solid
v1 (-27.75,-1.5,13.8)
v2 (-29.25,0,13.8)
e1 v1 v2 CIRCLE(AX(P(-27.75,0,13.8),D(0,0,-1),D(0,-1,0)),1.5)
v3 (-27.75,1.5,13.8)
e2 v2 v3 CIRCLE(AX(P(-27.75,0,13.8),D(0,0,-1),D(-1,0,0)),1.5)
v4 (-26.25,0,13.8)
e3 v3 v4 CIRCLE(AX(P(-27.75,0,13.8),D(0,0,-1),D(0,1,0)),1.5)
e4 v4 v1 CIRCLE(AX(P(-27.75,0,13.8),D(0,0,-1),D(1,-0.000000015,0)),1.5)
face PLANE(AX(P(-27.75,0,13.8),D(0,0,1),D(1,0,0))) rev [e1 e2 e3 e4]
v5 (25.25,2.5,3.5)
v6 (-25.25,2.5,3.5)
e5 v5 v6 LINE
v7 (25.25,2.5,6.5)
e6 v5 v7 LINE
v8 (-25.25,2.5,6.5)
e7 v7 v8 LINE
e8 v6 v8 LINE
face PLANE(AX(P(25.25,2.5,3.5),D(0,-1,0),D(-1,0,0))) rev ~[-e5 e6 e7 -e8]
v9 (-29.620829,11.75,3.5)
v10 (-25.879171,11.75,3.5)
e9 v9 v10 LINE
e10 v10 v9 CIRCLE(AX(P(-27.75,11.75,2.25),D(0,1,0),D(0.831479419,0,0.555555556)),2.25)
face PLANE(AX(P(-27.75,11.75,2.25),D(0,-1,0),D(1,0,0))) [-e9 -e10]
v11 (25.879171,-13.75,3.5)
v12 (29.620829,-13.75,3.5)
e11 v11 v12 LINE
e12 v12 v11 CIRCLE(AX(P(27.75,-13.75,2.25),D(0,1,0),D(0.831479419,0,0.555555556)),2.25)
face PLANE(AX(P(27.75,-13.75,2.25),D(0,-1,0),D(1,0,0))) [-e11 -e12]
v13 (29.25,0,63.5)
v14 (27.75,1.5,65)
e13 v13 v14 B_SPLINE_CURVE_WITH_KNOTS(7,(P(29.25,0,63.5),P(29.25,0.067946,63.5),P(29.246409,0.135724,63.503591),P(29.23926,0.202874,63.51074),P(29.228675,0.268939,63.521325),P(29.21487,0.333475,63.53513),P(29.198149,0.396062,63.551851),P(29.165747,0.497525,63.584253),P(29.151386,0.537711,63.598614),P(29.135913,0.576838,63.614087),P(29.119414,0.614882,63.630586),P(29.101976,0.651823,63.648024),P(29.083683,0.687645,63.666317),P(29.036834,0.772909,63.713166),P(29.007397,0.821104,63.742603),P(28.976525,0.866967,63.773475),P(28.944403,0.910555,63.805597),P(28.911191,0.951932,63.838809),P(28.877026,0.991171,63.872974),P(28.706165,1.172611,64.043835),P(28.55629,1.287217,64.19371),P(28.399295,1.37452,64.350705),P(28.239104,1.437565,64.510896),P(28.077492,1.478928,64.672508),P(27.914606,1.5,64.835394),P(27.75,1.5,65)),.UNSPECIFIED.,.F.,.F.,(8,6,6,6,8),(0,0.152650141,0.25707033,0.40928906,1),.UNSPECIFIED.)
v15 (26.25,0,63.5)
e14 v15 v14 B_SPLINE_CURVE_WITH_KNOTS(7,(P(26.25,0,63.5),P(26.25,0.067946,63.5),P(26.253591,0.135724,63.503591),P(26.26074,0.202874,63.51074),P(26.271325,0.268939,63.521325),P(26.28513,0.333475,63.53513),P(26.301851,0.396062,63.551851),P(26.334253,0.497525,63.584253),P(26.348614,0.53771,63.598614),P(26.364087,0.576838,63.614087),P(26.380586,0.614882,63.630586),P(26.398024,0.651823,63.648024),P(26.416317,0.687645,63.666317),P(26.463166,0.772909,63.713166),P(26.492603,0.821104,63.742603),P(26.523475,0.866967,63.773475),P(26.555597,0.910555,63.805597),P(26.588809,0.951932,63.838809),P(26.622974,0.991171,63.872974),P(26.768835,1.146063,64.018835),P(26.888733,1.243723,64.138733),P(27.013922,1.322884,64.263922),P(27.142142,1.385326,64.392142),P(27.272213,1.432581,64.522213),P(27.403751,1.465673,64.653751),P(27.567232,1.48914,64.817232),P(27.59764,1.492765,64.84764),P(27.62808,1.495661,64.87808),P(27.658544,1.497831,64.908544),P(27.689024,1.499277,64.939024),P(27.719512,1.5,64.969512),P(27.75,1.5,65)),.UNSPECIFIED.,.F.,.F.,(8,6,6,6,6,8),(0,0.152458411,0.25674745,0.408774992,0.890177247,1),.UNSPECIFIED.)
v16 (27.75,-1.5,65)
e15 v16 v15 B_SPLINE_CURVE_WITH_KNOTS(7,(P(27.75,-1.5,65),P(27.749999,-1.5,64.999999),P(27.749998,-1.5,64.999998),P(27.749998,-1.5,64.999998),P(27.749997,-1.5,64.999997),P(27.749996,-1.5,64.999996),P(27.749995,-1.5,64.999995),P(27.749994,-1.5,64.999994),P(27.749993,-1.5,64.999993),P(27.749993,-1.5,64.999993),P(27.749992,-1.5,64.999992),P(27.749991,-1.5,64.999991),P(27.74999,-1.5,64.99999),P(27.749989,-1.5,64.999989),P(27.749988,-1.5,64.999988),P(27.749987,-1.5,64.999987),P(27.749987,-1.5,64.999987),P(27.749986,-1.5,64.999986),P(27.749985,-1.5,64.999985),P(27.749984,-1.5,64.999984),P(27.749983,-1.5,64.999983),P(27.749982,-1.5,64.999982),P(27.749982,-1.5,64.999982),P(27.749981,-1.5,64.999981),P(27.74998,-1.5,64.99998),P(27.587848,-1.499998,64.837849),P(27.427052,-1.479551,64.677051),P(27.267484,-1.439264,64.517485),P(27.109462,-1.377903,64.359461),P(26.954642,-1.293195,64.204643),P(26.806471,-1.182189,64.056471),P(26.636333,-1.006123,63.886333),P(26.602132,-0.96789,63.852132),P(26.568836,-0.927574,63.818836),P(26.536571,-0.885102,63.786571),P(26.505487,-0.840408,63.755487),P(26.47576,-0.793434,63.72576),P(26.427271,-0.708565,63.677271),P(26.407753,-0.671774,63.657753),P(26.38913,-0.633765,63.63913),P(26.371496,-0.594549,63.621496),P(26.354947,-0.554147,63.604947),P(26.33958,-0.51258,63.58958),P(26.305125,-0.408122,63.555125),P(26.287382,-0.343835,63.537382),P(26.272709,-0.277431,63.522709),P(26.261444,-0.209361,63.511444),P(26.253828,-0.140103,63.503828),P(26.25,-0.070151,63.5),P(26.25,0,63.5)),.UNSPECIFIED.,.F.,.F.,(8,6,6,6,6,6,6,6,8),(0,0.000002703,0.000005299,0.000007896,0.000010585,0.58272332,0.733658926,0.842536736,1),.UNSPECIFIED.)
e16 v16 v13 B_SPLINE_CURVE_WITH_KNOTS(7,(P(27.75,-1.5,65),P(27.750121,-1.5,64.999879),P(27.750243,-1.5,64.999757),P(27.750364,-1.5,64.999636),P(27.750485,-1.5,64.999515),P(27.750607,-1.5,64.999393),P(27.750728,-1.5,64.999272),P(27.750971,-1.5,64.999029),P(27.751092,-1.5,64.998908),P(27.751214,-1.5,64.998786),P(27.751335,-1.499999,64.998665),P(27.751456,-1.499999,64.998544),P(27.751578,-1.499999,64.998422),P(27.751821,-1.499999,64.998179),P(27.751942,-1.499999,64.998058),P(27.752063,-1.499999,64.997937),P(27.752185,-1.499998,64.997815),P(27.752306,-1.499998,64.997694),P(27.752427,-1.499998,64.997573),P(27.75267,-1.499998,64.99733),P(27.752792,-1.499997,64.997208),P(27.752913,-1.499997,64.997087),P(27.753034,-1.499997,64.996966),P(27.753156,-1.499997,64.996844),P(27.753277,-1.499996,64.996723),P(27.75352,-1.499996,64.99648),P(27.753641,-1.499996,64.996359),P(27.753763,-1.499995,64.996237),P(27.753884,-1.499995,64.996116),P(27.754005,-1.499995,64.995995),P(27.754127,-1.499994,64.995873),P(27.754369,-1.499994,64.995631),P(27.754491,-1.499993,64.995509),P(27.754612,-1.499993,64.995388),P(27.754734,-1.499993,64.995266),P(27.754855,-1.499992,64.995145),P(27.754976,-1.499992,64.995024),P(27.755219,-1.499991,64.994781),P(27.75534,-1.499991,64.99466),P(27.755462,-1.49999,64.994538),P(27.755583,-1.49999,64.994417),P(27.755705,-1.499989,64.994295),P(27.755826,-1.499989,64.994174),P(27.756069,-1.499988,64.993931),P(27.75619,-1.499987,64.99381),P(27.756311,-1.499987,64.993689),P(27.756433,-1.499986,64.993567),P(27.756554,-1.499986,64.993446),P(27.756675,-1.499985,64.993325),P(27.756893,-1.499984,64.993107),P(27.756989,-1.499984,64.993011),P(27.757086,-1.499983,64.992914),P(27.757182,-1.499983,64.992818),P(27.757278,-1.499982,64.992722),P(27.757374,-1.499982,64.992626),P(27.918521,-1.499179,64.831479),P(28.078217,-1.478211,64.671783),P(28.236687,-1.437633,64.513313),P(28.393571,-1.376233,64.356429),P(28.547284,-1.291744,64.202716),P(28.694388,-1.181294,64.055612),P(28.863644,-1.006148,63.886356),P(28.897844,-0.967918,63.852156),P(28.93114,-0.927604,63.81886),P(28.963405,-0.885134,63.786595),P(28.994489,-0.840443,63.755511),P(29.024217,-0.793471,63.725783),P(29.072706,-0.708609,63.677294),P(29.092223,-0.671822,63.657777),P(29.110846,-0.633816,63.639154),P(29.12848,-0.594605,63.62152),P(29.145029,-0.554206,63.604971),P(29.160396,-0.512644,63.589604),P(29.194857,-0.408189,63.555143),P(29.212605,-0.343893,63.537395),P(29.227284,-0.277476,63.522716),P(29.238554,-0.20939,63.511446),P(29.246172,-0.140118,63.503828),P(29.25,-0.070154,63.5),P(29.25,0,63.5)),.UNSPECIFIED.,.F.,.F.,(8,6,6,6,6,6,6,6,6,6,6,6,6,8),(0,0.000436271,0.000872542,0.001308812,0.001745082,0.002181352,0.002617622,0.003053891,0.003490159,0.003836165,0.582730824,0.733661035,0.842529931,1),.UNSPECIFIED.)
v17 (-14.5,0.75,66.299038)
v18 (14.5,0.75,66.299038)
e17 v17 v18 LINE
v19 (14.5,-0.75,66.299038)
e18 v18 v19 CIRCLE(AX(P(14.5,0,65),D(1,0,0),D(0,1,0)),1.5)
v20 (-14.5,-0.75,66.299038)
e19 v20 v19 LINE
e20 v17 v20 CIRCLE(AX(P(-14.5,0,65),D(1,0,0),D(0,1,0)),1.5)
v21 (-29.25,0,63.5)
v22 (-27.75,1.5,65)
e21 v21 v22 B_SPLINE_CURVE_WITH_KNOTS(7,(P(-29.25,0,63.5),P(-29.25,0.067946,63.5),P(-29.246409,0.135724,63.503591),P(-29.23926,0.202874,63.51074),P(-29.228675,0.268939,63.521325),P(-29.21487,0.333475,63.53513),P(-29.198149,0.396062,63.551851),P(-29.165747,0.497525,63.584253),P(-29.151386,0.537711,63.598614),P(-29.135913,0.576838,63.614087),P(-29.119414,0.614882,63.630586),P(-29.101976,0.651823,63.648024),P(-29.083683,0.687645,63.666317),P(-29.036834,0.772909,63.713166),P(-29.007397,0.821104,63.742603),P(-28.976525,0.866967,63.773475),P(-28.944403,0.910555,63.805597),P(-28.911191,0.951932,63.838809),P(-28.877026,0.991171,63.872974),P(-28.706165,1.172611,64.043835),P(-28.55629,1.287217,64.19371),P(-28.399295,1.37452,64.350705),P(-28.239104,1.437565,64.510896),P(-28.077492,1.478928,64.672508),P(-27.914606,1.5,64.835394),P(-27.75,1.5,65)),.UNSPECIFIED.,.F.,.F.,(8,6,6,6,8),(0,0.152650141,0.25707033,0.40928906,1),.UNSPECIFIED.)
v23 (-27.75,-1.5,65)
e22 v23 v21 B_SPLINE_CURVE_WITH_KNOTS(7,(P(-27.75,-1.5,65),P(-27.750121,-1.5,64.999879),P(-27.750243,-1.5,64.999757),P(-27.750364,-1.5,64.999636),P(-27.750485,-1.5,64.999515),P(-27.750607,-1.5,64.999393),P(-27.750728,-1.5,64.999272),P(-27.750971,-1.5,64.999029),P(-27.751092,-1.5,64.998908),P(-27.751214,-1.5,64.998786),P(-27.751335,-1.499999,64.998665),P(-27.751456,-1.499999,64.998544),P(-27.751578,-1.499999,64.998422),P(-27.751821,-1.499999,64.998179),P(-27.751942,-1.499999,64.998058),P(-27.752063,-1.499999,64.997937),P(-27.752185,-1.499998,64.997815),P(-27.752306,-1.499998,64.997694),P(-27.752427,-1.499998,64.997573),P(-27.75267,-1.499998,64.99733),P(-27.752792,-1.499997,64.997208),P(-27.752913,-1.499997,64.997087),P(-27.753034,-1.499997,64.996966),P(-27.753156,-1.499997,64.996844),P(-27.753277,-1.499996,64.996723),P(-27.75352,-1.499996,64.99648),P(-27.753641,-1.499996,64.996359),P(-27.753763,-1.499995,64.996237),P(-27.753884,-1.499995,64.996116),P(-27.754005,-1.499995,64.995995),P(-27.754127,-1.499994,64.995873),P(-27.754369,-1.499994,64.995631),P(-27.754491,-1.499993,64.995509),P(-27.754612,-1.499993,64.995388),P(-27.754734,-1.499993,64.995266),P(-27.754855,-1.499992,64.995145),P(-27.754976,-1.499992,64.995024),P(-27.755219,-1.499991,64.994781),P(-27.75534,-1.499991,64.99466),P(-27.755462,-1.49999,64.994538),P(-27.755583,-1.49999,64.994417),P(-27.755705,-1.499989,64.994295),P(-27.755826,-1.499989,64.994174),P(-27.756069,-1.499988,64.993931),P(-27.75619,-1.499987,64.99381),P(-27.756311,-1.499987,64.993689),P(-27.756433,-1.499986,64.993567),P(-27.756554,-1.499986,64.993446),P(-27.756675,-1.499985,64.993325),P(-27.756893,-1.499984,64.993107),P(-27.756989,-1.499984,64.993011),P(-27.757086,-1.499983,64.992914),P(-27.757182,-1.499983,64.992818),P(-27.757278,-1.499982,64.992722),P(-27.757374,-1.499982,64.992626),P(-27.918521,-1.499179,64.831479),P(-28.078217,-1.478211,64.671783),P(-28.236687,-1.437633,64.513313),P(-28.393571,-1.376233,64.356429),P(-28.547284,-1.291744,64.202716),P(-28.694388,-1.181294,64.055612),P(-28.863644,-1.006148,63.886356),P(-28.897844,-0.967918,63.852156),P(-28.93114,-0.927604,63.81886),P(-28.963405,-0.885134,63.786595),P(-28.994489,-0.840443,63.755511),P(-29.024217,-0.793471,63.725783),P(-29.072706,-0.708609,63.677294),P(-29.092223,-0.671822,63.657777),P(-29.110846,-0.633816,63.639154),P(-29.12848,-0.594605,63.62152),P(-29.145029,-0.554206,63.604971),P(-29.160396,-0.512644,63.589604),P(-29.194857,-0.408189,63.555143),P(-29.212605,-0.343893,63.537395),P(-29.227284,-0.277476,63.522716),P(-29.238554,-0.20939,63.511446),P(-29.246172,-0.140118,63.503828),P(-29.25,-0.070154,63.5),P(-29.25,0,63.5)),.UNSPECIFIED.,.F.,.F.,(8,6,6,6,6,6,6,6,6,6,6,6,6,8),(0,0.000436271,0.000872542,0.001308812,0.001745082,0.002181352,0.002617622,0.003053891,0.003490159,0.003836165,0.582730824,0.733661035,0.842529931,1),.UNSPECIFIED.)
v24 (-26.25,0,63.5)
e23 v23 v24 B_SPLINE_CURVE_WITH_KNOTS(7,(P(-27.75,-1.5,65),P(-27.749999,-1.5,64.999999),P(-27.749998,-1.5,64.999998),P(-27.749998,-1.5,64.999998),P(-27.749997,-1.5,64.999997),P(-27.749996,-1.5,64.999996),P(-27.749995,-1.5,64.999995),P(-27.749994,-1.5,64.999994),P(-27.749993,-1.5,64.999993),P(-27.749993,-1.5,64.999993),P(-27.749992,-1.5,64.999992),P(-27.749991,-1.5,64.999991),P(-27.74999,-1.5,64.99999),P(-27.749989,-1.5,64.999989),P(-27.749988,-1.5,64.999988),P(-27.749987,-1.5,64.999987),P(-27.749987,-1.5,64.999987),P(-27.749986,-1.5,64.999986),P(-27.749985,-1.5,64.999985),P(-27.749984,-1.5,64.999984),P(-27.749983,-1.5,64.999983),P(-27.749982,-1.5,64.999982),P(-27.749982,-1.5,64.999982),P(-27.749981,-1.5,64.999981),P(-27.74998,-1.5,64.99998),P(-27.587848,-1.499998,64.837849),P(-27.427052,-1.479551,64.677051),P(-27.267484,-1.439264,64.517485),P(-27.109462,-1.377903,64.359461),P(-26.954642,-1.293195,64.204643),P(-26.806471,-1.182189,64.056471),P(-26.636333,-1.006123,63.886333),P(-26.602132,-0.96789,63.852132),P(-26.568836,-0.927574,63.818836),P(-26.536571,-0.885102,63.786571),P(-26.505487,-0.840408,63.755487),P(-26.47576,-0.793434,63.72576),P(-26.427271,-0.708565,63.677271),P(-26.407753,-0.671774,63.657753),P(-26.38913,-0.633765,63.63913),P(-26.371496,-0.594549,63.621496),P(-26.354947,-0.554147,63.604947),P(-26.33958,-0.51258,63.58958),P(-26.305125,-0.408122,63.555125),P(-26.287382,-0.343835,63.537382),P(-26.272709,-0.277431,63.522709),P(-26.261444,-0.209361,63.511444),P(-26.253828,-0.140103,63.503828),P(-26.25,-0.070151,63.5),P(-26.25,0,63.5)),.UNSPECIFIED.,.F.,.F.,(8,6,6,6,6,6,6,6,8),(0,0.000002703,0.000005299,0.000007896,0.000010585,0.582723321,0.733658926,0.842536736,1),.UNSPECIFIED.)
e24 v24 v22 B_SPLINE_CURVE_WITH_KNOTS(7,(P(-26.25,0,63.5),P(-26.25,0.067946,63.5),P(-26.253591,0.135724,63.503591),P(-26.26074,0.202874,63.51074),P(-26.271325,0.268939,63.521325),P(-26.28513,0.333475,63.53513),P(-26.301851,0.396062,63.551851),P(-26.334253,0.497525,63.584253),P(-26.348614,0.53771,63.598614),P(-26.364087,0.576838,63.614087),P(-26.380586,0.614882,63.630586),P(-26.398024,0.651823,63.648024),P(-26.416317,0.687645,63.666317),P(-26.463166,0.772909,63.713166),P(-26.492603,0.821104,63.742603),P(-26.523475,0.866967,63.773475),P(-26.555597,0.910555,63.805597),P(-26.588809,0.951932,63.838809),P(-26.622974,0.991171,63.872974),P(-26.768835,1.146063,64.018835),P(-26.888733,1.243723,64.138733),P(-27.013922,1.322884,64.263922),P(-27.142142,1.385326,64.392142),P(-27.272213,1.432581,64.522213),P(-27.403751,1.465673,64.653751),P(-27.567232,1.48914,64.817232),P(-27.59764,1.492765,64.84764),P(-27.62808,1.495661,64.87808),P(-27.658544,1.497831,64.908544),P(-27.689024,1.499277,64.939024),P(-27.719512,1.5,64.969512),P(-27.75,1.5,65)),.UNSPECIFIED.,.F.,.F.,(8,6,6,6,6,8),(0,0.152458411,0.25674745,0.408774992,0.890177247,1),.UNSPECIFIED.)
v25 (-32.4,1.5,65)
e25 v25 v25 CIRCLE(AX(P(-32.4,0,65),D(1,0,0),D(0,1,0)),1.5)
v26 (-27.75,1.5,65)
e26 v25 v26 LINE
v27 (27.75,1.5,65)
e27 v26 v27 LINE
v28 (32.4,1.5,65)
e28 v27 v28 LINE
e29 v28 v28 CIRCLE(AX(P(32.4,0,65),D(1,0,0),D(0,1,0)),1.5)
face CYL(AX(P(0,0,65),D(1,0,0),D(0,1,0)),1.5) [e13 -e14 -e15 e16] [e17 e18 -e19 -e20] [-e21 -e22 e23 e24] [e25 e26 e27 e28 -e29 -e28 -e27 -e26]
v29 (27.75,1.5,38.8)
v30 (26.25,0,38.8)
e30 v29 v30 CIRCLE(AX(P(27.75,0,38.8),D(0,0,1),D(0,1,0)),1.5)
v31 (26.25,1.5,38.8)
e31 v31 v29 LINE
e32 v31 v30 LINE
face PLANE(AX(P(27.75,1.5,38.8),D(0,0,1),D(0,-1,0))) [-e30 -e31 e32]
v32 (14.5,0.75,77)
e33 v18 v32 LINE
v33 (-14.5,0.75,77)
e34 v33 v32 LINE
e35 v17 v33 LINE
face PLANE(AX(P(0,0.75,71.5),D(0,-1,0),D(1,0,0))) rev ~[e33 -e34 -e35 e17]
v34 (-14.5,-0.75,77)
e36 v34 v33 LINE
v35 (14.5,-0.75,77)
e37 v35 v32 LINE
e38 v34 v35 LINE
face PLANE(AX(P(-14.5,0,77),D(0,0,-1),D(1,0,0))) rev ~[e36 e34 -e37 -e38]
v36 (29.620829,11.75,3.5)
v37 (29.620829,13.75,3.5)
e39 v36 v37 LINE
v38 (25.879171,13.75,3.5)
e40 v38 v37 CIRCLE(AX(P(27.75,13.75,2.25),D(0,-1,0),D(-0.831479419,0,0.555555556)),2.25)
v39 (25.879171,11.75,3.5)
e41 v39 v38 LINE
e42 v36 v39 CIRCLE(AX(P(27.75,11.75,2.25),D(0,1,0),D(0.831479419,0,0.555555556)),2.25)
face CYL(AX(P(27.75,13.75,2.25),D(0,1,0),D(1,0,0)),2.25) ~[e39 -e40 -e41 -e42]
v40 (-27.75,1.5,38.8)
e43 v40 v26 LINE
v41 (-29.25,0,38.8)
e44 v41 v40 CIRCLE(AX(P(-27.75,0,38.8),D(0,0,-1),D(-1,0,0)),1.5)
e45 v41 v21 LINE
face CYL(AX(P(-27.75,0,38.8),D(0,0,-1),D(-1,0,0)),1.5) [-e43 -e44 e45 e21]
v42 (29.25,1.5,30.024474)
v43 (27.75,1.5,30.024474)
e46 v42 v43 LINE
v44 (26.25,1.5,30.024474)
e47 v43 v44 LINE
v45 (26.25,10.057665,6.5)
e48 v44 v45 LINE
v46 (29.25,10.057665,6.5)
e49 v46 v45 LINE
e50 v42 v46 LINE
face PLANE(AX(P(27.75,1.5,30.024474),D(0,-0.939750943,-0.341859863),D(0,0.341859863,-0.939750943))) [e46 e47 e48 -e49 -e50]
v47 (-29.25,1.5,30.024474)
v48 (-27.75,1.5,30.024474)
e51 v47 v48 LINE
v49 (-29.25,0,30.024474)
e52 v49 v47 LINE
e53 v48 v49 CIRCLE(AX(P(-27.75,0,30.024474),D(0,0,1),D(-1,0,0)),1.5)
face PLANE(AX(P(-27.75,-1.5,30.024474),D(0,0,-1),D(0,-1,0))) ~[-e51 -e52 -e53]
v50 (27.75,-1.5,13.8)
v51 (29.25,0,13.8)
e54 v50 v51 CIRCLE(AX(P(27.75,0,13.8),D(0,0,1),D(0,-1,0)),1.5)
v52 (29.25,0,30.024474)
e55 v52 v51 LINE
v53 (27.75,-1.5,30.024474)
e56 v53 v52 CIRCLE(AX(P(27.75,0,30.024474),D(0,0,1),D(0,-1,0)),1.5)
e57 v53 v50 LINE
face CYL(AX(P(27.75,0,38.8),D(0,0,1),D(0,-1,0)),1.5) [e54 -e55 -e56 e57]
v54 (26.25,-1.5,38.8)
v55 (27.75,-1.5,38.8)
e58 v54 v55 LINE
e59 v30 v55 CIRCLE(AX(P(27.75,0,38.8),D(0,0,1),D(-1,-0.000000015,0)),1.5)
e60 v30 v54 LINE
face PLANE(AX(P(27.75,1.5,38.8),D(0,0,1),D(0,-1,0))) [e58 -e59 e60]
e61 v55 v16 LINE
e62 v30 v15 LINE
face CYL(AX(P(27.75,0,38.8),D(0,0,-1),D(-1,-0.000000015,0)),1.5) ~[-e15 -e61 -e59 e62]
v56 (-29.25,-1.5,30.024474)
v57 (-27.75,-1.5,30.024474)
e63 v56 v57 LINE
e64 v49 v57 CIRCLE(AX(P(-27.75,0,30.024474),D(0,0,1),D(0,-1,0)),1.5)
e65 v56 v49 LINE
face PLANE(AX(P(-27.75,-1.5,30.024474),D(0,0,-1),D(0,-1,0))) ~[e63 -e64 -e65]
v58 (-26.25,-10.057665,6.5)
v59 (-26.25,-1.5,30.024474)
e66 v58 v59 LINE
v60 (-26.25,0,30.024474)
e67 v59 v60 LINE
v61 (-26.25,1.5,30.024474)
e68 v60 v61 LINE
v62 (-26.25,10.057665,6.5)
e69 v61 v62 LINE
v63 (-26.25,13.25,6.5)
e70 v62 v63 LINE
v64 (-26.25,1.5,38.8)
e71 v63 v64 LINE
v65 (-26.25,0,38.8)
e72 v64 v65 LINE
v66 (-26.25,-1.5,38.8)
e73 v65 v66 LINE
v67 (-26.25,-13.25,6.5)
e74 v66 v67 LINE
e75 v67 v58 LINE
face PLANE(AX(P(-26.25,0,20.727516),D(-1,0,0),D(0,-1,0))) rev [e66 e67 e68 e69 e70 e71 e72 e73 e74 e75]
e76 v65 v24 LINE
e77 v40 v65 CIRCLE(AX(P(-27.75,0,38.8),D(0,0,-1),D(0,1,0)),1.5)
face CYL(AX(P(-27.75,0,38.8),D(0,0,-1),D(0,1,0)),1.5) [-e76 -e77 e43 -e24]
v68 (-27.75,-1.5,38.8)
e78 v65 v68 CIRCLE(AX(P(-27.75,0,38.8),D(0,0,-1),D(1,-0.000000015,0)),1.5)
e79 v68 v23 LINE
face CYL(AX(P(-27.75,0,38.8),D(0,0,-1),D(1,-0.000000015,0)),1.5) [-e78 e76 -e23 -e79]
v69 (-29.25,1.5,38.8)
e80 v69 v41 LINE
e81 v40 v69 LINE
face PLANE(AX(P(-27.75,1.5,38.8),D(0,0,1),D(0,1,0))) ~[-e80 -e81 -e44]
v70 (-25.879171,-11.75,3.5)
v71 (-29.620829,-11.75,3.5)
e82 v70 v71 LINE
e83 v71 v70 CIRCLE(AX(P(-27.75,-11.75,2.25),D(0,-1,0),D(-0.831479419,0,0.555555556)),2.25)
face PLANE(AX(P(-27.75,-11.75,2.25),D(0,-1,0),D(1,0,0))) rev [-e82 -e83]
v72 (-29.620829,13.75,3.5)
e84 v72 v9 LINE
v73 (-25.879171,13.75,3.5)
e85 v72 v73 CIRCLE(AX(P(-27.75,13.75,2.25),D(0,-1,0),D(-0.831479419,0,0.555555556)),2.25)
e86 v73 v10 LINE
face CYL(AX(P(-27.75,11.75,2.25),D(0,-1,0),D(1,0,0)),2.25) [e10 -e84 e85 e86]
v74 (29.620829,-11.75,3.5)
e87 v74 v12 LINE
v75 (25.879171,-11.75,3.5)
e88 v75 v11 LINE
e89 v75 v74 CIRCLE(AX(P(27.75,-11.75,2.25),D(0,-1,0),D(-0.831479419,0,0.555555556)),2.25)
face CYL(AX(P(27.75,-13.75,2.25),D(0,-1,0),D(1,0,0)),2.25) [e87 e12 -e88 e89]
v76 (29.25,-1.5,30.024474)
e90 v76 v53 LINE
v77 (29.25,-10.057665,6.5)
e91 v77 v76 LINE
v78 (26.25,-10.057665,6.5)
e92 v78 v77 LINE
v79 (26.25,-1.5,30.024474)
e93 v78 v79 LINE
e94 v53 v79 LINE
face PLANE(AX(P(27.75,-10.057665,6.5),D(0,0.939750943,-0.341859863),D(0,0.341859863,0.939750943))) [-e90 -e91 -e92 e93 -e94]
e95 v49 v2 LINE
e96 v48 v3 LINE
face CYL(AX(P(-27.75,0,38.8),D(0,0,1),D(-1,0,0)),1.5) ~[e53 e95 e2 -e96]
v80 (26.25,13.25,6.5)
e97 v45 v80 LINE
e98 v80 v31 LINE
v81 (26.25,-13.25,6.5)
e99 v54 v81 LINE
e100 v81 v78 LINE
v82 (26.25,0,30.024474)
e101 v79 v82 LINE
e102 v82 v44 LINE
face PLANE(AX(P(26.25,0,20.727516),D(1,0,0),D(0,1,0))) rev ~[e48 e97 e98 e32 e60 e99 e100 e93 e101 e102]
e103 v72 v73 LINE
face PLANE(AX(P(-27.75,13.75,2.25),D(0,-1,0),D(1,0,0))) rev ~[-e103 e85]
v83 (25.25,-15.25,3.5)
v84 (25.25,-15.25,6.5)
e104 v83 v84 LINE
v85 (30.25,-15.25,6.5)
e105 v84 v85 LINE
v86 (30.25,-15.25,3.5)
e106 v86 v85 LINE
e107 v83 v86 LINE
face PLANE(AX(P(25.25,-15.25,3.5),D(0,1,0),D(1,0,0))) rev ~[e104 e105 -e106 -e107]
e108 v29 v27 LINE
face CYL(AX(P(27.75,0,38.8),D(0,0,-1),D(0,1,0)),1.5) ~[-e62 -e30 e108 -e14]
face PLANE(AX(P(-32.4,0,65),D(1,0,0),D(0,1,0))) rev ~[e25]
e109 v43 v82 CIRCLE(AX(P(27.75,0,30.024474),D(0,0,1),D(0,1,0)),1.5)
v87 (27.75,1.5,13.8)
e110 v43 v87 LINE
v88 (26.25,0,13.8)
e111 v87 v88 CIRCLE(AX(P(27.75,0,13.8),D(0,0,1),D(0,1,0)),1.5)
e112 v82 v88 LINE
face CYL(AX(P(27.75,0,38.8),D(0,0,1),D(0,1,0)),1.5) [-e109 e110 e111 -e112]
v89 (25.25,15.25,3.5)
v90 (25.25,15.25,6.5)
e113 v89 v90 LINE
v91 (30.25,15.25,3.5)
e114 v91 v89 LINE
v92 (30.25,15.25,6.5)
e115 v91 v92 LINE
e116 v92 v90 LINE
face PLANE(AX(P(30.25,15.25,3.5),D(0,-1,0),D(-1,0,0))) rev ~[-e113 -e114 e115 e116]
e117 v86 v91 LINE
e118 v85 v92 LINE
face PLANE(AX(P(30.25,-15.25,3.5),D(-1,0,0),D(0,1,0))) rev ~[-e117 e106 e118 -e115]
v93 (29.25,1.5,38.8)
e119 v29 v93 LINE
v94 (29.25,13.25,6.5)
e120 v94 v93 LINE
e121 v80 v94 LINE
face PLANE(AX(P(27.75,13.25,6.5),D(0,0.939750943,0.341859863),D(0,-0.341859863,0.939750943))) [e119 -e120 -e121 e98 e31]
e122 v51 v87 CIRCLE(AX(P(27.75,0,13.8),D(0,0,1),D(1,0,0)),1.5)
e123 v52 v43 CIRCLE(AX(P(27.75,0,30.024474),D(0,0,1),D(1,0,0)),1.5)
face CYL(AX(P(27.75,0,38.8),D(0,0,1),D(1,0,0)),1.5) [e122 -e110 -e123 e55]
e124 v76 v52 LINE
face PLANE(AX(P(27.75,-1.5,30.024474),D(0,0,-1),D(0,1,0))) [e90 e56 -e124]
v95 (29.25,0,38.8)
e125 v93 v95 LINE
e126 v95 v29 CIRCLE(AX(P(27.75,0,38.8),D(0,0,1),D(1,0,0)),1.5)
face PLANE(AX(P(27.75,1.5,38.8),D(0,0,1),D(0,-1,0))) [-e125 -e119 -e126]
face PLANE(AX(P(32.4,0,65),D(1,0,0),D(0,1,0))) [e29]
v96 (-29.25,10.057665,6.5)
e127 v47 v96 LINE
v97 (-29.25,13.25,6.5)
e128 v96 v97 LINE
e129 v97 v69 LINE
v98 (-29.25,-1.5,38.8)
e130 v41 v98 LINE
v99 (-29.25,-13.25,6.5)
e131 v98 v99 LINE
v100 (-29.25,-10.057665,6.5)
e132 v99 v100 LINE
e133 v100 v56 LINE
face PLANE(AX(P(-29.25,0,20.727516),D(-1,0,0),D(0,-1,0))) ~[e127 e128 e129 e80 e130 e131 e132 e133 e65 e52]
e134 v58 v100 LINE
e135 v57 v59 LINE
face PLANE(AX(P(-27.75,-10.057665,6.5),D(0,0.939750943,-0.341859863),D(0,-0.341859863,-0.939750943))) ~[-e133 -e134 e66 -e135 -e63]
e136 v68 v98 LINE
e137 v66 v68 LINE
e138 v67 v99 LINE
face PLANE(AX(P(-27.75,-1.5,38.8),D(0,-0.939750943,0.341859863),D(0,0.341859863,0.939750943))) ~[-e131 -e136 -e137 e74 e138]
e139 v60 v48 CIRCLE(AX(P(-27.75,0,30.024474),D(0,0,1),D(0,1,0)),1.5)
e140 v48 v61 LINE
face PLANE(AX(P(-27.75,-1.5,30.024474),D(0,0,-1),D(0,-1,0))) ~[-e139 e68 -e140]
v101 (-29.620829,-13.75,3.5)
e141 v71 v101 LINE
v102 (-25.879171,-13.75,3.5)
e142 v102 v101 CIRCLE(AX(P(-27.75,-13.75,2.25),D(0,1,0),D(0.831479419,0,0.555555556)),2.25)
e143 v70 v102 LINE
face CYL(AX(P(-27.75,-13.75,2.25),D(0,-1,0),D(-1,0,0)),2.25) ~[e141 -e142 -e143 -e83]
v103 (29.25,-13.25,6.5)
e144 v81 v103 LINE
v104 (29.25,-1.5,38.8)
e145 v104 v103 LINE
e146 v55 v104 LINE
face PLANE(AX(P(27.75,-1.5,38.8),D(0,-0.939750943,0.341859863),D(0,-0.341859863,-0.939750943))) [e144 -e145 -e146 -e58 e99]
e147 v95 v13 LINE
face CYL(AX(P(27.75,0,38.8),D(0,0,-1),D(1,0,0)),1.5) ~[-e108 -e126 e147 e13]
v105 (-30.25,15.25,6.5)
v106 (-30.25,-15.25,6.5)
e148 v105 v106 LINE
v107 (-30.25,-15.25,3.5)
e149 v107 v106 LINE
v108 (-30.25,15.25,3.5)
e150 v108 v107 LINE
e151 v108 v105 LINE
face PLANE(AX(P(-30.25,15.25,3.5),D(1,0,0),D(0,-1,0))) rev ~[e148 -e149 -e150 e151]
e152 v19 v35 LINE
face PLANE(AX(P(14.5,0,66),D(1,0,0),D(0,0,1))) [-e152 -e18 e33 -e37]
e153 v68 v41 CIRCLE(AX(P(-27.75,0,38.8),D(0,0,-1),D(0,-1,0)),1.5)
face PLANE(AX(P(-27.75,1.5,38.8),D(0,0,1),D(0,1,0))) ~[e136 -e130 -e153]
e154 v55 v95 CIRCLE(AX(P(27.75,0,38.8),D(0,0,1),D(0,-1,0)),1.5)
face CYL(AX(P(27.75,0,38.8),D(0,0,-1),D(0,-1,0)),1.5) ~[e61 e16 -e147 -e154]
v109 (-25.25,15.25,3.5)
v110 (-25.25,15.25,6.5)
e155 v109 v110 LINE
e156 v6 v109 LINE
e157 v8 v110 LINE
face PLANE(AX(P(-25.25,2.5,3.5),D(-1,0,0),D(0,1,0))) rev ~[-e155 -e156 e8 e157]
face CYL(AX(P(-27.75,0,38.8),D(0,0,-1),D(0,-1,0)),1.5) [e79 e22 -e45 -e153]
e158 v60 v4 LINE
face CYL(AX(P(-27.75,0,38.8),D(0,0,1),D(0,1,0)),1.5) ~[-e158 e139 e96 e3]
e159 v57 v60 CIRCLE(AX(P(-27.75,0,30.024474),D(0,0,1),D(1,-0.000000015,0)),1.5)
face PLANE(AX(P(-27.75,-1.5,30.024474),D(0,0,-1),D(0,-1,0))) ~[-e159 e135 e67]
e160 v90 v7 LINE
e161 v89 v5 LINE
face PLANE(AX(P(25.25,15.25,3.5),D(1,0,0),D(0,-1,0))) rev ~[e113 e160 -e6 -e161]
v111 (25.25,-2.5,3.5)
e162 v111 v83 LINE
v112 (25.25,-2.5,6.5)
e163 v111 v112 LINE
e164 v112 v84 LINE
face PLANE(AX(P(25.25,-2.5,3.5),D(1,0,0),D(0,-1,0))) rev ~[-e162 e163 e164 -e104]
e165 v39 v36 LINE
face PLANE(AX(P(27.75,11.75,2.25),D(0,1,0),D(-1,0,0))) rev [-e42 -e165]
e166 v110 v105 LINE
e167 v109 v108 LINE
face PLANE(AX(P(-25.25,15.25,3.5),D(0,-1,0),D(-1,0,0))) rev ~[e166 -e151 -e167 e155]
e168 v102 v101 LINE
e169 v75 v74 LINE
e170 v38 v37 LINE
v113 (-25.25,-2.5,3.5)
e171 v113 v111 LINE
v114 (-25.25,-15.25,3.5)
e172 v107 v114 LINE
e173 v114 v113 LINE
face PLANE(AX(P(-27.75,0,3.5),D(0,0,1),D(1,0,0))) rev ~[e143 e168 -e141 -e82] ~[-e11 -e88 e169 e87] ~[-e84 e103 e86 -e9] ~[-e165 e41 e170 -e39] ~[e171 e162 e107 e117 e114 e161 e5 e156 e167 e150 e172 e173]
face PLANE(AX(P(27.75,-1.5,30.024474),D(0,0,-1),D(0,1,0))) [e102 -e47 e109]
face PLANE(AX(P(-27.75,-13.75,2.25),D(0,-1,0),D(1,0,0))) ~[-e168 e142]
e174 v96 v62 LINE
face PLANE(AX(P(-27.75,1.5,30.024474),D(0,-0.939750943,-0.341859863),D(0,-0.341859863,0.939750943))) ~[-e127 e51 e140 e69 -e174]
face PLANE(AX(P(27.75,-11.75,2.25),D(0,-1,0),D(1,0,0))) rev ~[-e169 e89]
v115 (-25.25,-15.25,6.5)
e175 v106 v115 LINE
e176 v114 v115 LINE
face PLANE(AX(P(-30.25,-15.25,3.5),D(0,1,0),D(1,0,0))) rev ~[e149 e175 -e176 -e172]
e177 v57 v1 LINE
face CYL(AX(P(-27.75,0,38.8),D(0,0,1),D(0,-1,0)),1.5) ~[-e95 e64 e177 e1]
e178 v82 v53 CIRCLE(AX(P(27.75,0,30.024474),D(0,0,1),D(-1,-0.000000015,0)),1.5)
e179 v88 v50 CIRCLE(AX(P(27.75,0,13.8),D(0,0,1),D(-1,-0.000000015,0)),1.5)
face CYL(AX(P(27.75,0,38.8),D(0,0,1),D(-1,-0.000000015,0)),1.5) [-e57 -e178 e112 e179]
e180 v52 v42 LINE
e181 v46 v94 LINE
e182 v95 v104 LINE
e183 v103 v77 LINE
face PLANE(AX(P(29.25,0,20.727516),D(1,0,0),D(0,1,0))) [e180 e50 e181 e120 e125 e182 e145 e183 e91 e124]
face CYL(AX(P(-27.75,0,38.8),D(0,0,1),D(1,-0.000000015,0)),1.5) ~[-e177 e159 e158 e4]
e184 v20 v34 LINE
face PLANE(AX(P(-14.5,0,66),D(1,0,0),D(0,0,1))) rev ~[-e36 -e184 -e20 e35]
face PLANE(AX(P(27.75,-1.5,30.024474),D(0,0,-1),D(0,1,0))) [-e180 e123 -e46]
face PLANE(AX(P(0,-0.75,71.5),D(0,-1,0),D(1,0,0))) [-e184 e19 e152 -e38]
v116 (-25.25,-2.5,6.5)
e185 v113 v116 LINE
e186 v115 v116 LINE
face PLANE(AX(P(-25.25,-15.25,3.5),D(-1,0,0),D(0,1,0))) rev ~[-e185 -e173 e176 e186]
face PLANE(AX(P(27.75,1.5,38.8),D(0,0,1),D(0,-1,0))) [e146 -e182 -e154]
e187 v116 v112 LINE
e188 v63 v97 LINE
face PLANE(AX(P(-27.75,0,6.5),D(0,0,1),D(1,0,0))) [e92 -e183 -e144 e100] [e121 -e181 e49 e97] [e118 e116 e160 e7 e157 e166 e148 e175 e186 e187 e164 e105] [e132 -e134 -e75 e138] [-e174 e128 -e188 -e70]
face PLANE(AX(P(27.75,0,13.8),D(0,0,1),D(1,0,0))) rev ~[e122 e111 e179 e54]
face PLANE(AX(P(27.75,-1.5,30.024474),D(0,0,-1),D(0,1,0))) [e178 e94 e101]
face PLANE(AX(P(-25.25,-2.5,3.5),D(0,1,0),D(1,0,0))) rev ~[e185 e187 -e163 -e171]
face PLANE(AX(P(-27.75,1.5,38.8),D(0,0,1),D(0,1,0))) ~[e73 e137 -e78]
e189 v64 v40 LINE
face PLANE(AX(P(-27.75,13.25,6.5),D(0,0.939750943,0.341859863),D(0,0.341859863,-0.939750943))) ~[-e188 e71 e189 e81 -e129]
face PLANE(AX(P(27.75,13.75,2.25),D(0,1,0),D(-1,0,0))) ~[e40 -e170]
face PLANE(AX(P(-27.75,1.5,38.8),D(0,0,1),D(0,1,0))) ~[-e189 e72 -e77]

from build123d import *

# Parameters (mm, degrees)
F2_DEPTH          = 3
F6_DEPTH          = 1.5
F9_DEPTH          = 26.2
F9_DEPTH_BACK     = 25
F10_R             = 1.5
F11_DEPTH         = 32.4
F13_R             = 2.25
F14_DEPTH         = 2
F14_COPIES2_COUNT = 2
F14_COPIES2_PITCH = 61.077819
F15_W             = 29
F15_H             = 11
F16_DEPTH         = 0.75


# Not quite as in the source:
# - a pattern or mirror of a feature is missing from the dataset's text; its kind, count and spacing are read off the source's solid


with BuildPart() as f2:
    # F1 (on offset) → F2 (new body)
    with BuildSketch(Plane.XY.offset(3.5)):
        Polygon((-25.25, -15.25), (-25.25, -2.5), (-25.25, 2.5), (-25.25, 15.25), (-30.25, 15.25), (-30.25, 0), (-30.25, -15.25), align=None)
        Polygon((0, -2.5), (25.25, -2.5), (25.25, 2.5), (0, 2.5), (-25.25, 2.5), (-25.25, -2.5), align=None)
        Polygon((30.25, -15.25), (30.25, 0), (30.25, 15.25), (25.25, 15.25), (25.25, 2.5), (25.25, -2.5), (25.25, -15.25), align=None)
    extrude(amount=F2_DEPTH)

    # F5 (on plane+point) → F6 (join, symmetric)
    with BuildSketch(Plane.YZ.offset(27.75)):
        Polygon((10.057664814, 6.5), (13.25, 6.5), (1.5, 38.8), (0, 38.8), (-1.5, 38.8), (-13.25, 6.5), (-10.057664814, 6.5), (-1.5, 30.0244743399), (0, 30.0244743399), (1.5, 30.0244743399), align=None)
    f6 = extrude(amount=F6_DEPTH, both=True)

    # F6_copies: F6 across plane
    add(f6.mirror(Plane(origin=(0, 0, 0), x_dir=(0, 0, -1), z_dir=(-1, 0, 0))))

    # F8 (on face) → F9 (join, two sides)
    with BuildSketch(Plane.XY.offset(38.8)) as f9_sk:
        with BuildLine():
            ThreePointArc((27.75, -1.5), (28.8106601718, -1.0606601718), (29.25, 0))
            ThreePointArc((29.25, 0), (28.8106601718, 1.0606601718), (27.75, 1.5))
            ThreePointArc((27.75, 1.5), (26.68933982, 1.0606601636), (26.25, -2.31e-08))
            ThreePointArc((26.25, -2.31e-08), (26.6893398364, -1.06066018), (27.75, -1.5))
        make_face()
    f9 = extrude(amount=F9_DEPTH) + extrude(f9_sk.sketch, amount=-F9_DEPTH_BACK)

    # F9_copies: F9 across plane
    add(f9.mirror(Plane(origin=(0, 0, 0), x_dir=(0, 0, -1), z_dir=(-1, 0, 0))))

    # F10 (on Right) → F11 (join, symmetric)
    with BuildSketch(Plane.YZ):
        with Locations((0, 65)):
            Circle(F10_R)
    extrude(amount=F11_DEPTH, both=True)

    # F13 (on offset) → F14 (join)
    with BuildSketch(Plane.XZ.offset(13.75)):
        with Locations((27.75, 2.25)):
            Circle(F13_R)
    f14 = extrude(amount=-F14_DEPTH)

    # F14_copies: F14 across plane
    add(f14.mirror(Plane.ZX))

    # F14_copies1: F14 across plane
    add(f14.mirror(Plane(origin=(0, 0, 0), x_dir=(0, 0, -1), z_dir=(-1, 0, 0))))

    # F14_copies2: F14 ×2
    with Locations(*[Vector(-0.908676844, 0.4175001716, 0) * (i * F14_COPIES2_PITCH) for i in range(1, F14_COPIES2_COUNT)]):
        add(f14)

    # F15 (on Front) → F16 (join, symmetric)
    with BuildSketch(Plane.XZ):
        with Locations((0, 71.5)):
            Rectangle(F15_W, F15_H)
    extrude(amount=F16_DEPTH, both=True)


solid = f2.part
